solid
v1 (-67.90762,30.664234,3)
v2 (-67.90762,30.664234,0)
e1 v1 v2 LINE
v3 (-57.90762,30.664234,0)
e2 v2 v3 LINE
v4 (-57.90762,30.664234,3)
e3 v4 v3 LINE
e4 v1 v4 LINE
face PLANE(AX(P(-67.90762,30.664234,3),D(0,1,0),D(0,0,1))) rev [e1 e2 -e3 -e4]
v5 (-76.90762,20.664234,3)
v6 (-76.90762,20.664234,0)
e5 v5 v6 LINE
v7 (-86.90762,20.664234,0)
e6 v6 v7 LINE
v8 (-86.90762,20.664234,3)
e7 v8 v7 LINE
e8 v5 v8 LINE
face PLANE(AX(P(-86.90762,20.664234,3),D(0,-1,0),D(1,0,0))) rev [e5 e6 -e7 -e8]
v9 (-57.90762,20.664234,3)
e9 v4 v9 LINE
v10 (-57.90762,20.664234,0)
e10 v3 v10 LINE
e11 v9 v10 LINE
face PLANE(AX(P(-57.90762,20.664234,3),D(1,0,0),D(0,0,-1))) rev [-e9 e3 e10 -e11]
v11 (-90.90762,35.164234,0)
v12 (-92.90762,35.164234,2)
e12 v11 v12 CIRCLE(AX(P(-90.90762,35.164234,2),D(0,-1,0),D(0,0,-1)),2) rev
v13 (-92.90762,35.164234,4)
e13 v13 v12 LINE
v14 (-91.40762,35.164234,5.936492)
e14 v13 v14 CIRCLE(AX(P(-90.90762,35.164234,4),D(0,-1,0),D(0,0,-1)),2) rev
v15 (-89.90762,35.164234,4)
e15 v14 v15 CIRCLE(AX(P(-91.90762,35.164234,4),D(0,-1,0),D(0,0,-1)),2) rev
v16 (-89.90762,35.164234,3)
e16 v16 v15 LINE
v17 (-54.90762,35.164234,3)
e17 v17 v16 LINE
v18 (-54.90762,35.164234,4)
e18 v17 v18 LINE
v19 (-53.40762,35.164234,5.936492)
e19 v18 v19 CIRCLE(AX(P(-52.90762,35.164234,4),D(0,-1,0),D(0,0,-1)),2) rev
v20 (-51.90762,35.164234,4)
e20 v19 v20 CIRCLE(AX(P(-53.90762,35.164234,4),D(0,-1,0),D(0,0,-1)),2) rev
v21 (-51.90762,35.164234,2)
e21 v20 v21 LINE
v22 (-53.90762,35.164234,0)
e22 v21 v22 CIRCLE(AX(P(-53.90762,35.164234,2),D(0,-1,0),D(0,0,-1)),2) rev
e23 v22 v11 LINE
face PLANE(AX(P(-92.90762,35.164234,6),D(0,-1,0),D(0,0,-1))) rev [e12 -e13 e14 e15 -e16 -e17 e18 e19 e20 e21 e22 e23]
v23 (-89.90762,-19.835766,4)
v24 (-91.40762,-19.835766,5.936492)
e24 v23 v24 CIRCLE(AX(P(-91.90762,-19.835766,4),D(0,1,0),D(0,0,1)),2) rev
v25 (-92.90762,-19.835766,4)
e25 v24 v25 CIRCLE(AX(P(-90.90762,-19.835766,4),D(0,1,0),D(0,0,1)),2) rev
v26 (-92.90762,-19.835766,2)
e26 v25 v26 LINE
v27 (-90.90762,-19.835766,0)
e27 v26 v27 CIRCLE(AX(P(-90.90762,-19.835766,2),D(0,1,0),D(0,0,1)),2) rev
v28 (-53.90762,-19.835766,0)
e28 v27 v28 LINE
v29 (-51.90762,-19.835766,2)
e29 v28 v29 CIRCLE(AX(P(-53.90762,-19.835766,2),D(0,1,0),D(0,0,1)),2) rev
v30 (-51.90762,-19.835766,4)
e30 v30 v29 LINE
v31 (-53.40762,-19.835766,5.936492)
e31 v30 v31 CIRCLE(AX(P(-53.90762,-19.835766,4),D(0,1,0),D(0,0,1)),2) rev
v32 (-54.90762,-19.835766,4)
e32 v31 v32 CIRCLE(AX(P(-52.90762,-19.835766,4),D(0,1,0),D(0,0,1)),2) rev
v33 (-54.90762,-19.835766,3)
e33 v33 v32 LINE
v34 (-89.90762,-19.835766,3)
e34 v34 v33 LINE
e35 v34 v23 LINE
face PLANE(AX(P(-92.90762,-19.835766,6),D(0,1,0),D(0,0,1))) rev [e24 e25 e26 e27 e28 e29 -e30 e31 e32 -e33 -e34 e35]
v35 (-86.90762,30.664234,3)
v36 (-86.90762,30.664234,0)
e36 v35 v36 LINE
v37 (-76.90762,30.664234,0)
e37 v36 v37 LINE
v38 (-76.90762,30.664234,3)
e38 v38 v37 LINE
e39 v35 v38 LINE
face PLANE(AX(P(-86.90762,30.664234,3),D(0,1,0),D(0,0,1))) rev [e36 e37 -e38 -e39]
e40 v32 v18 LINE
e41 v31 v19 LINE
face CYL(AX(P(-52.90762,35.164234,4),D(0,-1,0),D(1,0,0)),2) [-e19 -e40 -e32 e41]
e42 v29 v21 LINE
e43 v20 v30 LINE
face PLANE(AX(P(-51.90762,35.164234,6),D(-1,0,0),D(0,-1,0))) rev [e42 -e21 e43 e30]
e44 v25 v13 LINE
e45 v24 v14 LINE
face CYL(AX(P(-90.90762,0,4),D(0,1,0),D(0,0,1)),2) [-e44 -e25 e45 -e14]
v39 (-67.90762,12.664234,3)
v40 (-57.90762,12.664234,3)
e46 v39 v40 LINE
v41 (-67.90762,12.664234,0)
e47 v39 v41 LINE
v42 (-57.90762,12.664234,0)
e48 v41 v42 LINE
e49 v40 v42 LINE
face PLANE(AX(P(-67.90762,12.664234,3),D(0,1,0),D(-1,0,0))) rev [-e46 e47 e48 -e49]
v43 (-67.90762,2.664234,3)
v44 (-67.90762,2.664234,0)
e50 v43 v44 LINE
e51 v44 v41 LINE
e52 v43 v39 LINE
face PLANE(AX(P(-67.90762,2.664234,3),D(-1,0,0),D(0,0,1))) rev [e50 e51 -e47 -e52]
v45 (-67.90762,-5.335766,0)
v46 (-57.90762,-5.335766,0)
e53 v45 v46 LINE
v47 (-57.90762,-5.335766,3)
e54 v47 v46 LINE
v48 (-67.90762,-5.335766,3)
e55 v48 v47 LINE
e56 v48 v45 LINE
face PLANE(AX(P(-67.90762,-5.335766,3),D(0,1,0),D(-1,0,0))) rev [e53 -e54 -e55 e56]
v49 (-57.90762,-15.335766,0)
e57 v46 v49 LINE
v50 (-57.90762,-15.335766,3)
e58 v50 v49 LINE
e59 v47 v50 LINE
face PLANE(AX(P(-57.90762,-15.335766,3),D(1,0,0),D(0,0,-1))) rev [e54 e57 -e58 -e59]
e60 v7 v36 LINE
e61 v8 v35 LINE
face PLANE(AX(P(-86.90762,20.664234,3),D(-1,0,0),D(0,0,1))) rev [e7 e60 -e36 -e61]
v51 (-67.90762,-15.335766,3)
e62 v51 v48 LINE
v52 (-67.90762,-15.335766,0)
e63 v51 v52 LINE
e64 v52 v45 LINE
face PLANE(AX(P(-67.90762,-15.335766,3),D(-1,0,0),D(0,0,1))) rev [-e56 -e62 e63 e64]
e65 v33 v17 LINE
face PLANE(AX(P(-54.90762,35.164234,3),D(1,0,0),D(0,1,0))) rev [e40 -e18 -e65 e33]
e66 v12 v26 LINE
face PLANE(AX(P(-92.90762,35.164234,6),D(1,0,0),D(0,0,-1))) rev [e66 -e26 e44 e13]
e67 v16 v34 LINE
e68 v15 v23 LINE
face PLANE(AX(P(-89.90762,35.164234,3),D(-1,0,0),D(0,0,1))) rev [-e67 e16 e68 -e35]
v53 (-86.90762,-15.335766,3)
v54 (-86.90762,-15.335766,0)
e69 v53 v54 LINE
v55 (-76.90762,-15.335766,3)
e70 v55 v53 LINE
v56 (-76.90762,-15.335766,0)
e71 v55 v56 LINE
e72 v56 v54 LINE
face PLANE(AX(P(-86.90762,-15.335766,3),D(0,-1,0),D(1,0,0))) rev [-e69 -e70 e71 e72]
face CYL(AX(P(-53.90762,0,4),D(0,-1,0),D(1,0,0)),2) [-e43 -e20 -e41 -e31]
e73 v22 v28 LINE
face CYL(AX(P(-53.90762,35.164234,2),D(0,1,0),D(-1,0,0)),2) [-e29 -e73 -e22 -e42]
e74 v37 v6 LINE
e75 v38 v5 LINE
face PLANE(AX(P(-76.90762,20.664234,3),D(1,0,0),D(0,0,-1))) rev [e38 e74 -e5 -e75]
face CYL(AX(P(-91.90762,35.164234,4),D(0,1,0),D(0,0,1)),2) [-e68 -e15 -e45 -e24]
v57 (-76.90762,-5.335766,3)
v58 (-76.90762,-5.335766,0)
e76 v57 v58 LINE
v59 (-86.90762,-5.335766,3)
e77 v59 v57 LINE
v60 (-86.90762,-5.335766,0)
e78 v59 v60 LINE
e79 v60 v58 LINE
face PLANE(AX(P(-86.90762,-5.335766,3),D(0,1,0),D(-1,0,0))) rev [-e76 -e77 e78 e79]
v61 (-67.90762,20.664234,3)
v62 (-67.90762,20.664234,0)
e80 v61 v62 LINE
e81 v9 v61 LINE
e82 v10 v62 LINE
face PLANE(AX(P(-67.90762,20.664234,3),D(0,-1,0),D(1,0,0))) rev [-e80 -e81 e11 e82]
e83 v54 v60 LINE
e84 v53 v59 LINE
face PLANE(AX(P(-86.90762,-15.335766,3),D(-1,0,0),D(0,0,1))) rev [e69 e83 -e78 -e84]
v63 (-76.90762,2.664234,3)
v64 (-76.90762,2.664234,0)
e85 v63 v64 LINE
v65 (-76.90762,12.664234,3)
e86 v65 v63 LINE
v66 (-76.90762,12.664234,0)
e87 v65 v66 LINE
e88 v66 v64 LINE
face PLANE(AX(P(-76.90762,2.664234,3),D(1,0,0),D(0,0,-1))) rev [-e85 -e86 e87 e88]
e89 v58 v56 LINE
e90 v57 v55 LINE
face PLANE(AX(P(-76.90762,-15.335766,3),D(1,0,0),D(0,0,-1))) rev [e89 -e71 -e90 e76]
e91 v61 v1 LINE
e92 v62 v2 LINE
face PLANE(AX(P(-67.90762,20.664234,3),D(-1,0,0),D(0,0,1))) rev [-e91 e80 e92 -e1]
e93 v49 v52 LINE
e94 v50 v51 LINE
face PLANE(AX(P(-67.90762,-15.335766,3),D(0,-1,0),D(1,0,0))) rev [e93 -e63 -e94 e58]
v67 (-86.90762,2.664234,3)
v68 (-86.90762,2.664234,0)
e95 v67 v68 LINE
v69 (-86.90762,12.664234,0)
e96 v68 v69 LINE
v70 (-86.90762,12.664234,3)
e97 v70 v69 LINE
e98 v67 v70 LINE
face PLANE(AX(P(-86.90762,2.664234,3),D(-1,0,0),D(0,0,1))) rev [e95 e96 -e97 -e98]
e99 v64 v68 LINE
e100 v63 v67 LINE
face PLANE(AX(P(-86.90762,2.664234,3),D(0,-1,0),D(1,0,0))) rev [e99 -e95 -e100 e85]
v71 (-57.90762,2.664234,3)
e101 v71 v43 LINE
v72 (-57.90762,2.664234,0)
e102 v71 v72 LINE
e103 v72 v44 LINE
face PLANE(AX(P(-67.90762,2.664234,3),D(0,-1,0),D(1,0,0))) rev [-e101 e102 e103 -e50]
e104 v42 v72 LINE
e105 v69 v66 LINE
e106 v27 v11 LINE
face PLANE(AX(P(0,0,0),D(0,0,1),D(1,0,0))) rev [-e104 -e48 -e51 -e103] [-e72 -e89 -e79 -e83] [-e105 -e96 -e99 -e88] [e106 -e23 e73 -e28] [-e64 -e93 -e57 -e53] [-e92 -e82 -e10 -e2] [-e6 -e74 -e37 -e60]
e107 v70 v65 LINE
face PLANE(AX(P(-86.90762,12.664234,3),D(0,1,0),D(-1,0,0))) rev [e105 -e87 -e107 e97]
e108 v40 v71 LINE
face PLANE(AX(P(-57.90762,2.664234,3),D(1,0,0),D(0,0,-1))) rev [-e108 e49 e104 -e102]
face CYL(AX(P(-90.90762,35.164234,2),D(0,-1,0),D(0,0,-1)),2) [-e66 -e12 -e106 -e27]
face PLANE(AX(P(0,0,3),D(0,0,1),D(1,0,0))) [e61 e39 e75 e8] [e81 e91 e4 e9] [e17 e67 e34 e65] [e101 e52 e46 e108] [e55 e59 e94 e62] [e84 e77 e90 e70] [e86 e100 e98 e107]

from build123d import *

# Parameters (mm, degrees)
CROQUIS1_W              = 41
CROQUIS1_H              = 55
SALIENTE_EXTRUIR1_DEPTH = 6
CROQUIS2_W              = 35
CROQUIS2_H              = 55
CORTAR_EXTRUIR1_DEPTH   = 3
REDONDEO1_R             = 2
CROQUIS3_W              = 10
CROQUIS3_H              = 10
CORTAR_EXTRUIR2_DEPTH   = 3


with BuildPart() as part:
    # Croquis1 → Saliente-Extruir1 (new body)
    with BuildSketch(Plane.XY):
        with Locations((-72.407619756, 7.664233577)):
            Rectangle(CROQUIS1_W, CROQUIS1_H)
    extrude(amount=SALIENTE_EXTRUIR1_DEPTH)

    # Croquis2 → Cortar-Extruir1 (cut)
    with BuildSketch(Plane.XY.offset(6)):
        with Locations((-72.407619756, 7.664233577)):
            Rectangle(CROQUIS2_W, CROQUIS2_H)
    extrude(amount=-CORTAR_EXTRUIR1_DEPTH, mode=Mode.SUBTRACT)

    # Redondeo1
    # the kernel refuses this fillet: 2 mm, written as the material it takes off along each edge
    with BuildSketch(Plane(origin=(-54.907619756, 40.164233577, 6), x_dir=(1, 0, 0), z_dir=(0, -1, 0)), Plane(origin=(-51.907619756, 40.164233577, 6), x_dir=(0, 0, -1), z_dir=(0, -1, 0)), Plane(origin=(-51.907619756, 40.164233577, 0), x_dir=(-1, 0, 0), z_dir=(0, -1, 0)), Plane(origin=(-92.907619756, -24.835766423, 0), x_dir=(1, 0, 0), z_dir=(0, 1, 0))) as redondeo1_piece_1:
        with BuildLine():
            CenterArc((REDONDEO1_R, -REDONDEO1_R), REDONDEO1_R, 90, 90)
            Line((0, -REDONDEO1_R), (0, 0))
            Line((0, 0), (REDONDEO1_R, 0))
        make_face()
    extrude(amount=65, mode=Mode.SUBTRACT)
    with BuildSketch(Plane(origin=(-92.907619756, -24.835766423, 6), x_dir=(1, 0, 0), z_dir=(0, 1, 0)), Plane(origin=(-89.907619756, -24.835766423, 6), x_dir=(0, 0, -1), z_dir=(0, 1, 0))) as redondeo1_piece_2:
        with BuildLine():
            CenterArc((REDONDEO1_R, REDONDEO1_R), REDONDEO1_R, 180, 90)
            Line((0, REDONDEO1_R), (0, 0))
            Line((0, 0), (REDONDEO1_R, 0))
        make_face()
    extrude(amount=65, mode=Mode.SUBTRACT)

    # Croquis3 → Cortar-Extruir2 (cut)
    with BuildSketch(Plane(origin=(0, 0, 0), x_dir=(-1, 0, 0), z_dir=(0, 0, -1))):
        with Locations((81.907619756, -10.335766423)):
            Rectangle(CROQUIS3_W, CROQUIS3_H)
        with Locations((62.907619756, -10.335766423)):
            Rectangle(CROQUIS3_W, CROQUIS3_H)
        with Locations((62.907619756, 7.664233577)):
            Rectangle(CROQUIS3_W, CROQUIS3_H)
        with Locations((62.907619756, 25.664233577)):
            Rectangle(CROQUIS3_W, CROQUIS3_H)
        with Locations((81.907619756, 7.664233577)):
            Rectangle(CROQUIS3_W, CROQUIS3_H)
        with Locations((81.907619756, 25.664233577)):
            Rectangle(CROQUIS3_W, CROQUIS3_H)
    extrude(amount=-CORTAR_EXTRUIR2_DEPTH, mode=Mode.SUBTRACT)


solid = part.part
